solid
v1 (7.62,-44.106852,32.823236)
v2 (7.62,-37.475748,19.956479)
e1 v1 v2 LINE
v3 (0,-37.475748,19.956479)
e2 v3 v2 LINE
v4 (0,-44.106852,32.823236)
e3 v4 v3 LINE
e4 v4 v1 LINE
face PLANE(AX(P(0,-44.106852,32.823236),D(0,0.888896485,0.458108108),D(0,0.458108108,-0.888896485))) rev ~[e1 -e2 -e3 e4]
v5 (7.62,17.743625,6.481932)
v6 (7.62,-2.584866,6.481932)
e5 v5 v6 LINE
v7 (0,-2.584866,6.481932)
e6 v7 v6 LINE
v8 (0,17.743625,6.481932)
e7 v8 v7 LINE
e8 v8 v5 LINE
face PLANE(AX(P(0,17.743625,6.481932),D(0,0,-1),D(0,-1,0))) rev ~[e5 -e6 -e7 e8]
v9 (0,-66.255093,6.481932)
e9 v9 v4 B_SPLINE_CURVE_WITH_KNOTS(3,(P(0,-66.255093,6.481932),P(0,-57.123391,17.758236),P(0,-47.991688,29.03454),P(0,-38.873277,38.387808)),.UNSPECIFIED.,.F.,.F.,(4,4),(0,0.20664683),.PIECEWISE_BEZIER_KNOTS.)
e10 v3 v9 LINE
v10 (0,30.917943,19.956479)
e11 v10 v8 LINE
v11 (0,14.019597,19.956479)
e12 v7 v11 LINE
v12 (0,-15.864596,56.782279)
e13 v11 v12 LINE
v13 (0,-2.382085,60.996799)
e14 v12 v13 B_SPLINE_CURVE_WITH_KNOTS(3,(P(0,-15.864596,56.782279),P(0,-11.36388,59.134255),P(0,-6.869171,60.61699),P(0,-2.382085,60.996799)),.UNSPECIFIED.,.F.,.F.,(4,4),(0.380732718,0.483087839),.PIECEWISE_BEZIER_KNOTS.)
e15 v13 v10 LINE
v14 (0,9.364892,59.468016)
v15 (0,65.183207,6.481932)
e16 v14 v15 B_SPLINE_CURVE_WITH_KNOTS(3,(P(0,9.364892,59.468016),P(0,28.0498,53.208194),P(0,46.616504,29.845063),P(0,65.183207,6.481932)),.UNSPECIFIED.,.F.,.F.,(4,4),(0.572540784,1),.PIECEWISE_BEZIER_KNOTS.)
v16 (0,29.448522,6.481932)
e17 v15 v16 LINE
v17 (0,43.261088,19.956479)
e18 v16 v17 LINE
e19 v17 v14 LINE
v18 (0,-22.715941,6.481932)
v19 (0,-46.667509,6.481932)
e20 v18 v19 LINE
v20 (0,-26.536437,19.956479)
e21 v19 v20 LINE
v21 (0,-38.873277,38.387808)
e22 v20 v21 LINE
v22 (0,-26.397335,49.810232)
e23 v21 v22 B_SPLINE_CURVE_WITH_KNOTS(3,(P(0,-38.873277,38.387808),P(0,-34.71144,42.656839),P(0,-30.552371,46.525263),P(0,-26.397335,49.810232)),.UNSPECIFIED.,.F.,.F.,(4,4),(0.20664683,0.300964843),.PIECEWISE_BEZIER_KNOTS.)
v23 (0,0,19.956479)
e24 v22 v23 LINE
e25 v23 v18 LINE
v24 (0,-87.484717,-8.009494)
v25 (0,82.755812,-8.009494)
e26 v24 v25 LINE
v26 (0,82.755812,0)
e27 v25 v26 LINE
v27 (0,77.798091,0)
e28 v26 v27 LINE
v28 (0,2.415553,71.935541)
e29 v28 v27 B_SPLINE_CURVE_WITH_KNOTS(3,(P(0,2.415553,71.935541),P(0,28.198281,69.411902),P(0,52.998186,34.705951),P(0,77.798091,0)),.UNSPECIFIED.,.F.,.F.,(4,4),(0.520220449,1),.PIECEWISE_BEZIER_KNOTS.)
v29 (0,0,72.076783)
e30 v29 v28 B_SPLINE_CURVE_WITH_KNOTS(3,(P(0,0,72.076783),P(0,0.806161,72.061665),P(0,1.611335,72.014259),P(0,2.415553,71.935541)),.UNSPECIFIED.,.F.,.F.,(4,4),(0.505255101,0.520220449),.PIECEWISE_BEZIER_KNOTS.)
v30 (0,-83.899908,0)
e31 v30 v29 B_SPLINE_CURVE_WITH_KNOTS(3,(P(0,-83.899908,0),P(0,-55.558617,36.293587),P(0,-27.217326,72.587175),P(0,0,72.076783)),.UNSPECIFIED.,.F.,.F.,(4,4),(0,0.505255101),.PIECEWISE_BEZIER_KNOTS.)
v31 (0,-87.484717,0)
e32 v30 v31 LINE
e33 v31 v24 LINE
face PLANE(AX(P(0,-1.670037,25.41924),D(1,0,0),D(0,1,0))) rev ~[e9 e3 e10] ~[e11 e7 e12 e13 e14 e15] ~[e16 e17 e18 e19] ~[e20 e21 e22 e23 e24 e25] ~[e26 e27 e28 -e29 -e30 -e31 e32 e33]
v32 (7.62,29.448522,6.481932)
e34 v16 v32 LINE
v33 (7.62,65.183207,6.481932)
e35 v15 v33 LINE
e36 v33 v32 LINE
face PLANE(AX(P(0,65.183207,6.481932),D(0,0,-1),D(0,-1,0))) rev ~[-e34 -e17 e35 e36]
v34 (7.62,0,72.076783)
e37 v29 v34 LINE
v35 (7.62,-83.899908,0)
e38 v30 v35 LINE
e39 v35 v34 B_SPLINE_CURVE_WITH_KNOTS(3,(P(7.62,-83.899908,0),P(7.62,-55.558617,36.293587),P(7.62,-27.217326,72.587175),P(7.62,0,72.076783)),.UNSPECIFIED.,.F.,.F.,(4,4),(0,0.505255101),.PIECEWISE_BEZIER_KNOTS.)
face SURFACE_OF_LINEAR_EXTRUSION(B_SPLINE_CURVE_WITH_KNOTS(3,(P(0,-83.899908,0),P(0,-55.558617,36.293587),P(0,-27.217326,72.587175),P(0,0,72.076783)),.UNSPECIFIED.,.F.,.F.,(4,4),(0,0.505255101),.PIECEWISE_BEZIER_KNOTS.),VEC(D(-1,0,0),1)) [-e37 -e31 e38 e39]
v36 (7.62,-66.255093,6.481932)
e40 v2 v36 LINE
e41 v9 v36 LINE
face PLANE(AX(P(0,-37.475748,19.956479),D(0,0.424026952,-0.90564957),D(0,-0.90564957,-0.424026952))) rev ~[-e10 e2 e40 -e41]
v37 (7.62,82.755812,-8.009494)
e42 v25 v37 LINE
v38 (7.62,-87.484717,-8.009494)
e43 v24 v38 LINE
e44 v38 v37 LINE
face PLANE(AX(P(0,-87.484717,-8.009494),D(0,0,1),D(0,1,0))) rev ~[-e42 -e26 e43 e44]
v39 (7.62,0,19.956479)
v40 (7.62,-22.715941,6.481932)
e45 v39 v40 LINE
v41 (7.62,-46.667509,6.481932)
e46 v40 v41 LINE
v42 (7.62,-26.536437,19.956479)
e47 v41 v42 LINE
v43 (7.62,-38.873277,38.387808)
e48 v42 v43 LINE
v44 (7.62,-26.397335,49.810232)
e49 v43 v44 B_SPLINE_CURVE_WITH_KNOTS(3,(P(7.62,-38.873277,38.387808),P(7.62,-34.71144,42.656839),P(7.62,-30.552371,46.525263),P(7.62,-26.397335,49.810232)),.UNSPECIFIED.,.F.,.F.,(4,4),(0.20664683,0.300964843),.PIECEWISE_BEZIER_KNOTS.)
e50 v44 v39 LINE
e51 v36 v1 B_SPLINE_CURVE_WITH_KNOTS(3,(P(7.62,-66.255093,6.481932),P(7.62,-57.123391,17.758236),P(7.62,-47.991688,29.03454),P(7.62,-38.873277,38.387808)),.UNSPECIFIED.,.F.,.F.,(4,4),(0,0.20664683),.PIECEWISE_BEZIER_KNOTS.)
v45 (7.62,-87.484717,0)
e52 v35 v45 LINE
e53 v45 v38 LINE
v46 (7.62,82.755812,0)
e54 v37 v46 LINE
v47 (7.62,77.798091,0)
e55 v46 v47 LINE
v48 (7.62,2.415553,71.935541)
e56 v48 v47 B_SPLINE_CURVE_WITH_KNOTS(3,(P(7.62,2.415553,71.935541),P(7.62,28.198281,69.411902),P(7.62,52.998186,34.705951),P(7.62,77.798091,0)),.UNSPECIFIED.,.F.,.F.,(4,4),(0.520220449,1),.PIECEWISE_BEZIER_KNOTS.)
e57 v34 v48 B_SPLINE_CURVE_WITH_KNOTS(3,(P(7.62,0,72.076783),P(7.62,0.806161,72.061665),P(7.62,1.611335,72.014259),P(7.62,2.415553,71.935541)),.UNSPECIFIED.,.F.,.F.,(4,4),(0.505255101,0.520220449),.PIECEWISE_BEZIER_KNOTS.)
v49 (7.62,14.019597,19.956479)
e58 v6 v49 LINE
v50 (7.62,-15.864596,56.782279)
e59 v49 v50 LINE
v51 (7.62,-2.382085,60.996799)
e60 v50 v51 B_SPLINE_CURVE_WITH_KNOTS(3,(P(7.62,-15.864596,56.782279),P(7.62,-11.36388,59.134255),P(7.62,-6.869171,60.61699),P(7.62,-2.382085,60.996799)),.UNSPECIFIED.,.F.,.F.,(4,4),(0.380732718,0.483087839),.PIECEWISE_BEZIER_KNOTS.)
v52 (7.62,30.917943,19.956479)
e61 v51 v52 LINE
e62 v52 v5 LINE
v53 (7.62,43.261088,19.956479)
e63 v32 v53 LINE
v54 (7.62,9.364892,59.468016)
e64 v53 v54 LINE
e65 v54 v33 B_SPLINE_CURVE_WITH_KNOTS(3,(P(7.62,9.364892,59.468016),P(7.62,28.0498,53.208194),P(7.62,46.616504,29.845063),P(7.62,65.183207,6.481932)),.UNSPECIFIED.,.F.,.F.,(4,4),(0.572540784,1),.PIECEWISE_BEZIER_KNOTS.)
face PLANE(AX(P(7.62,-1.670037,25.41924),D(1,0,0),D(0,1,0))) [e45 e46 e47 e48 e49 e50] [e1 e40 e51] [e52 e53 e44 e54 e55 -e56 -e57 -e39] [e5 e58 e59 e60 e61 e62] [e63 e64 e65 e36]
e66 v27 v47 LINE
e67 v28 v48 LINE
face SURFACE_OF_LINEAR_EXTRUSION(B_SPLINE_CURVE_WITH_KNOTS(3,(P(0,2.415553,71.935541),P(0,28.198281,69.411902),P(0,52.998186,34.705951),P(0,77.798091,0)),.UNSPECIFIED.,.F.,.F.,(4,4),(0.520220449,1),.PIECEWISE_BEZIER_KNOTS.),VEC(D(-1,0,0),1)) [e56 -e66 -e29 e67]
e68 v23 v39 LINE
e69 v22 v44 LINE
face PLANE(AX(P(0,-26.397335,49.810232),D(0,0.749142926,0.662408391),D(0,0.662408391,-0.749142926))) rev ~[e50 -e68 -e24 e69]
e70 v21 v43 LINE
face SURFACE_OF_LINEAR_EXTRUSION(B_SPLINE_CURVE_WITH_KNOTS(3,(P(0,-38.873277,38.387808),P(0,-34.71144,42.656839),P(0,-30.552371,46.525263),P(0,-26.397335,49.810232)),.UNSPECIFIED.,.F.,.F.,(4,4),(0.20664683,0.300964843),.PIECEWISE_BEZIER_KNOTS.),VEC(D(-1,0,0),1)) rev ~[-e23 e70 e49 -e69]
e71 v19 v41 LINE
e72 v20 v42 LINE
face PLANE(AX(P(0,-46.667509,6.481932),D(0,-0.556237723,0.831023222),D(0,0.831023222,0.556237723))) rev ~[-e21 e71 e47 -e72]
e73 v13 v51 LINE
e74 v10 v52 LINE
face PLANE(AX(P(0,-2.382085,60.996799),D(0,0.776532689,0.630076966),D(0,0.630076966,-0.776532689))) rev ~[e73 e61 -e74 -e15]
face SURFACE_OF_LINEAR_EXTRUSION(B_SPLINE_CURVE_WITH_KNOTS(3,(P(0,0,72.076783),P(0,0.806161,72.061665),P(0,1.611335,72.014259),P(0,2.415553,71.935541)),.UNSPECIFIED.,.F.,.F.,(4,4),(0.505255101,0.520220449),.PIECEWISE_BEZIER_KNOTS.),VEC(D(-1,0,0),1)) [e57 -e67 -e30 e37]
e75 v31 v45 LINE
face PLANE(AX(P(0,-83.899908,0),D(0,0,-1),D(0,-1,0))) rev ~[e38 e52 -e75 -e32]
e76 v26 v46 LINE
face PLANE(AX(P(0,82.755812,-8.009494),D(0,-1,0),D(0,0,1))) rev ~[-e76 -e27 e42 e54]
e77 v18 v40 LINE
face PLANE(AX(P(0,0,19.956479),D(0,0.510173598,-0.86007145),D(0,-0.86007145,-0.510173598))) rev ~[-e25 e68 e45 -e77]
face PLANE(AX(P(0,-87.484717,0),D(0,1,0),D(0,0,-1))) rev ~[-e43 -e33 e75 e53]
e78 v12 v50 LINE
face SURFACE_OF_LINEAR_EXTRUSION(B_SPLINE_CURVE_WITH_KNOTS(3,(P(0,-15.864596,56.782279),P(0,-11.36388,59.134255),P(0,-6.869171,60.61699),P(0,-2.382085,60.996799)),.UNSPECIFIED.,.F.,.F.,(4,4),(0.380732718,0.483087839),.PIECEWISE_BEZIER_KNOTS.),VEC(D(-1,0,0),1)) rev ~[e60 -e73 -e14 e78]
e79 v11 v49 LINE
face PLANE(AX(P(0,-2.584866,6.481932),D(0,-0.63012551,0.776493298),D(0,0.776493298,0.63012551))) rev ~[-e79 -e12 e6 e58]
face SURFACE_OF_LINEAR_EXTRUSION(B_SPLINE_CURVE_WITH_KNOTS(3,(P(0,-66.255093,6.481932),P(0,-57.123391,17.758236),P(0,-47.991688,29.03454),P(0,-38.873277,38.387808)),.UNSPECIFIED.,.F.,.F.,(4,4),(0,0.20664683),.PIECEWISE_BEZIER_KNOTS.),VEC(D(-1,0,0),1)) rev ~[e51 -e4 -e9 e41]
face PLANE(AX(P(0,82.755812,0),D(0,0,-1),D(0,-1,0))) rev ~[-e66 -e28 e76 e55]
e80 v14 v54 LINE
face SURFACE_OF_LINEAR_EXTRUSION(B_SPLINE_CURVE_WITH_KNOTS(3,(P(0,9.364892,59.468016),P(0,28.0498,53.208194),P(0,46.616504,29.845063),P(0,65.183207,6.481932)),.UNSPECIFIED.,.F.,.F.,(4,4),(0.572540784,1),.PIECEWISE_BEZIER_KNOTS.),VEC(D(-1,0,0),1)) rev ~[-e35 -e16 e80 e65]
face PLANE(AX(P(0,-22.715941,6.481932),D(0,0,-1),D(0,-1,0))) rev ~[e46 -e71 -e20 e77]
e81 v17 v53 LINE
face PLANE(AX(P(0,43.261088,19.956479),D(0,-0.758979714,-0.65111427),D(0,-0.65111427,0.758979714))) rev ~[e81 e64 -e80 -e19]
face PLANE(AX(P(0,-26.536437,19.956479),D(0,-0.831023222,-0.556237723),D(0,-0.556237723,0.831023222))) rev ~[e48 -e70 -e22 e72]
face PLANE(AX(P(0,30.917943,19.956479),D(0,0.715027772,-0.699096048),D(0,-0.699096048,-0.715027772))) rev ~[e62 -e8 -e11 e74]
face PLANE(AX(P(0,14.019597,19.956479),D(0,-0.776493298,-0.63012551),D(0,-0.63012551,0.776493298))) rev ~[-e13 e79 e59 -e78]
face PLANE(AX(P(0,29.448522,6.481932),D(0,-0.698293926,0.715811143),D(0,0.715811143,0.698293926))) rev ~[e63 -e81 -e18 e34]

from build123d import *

# Parameters (mm, degrees)
F1_DEPTH = 7.62


with BuildPart() as f1:
    # F0 (on Right) → F1 (new body)
    with BuildSketch(Plane.YZ):
        with BuildLine():
            Line((-83.8999077678, 0), (-76.0438218713, 0))
            Line((-76.0438218713, 0), (-68.3361637849, 0))
            Line((-68.3361637849, 0), (-65.6663442796, 0))
            Line((-65.6663442796, 0), (-59.0906857838, 0))
            Line((-59.0906857838, 0), (-56.6208846061, 0))
            Line((-56.6208846061, 0), (-50.1111261547, 0))
            Line((-50.1111261547, 0), (-47.2127646201, 0))
            Line((-47.2127646201, 0), (-40.9584082663, 0))
            Line((-40.9584082663, 0), (-38.0600504577, 0))
            Line((-38.0600504577, 0), (-31.6531471908, 0))
            Line((-31.6531471908, 0), (-28.9073325694, 0))
            Line((-28.9073325694, 0), (-22.5004293025, 0))
            Line((-22.5004293025, 0), (-19.9071597308, 0))
            Line((-19.9071597308, 0), (-13.4495065357, 0))
            Line((-13.4495065357, 0), (-10.754442774, 0))
            Line((-10.754442774, 0), (-4.1949953884, 0))
            Line((-4.1949953884, 0), (-1.6017258168, 0))
            Line((-1.6017258168, 0), (4.8051769845, 0))
            Line((4.8051769845, 0), (7.3984456249, 0))
            Line((7.3984456249, 0), (13.8053493574, 0))
            Line((13.8053493574, 0), (16.7037080973, 0))
            Line((16.7037080973, 0), (23.1106095016, 0))
            Line((23.1106095016, 0), (25.7038809359, 0))
            Line((25.7038809359, 0), (32.1107842028, 0))
            Line((32.1107842028, 0), (34.5515049994, 0))
            Line((34.5515049994, 0), (40.958404541, 0))
            Line((40.958404541, 0), (43.7042228877, 0))
            Line((43.7042228877, 0), (50.1111261552, 0))
            Line((50.1111261552, 0), (52.7043938637, 0))
            Line((52.7043938637, 0), (59.263844043, 0))
            Line((59.263844043, 0), (61.8571154775, 0))
            Line((61.8571154775, 0), (72.8403702378, 0))
            Line((72.8403702378, 0), (77.7980908751, 0))
            add(Edge.make_bspline(
                [(2.4155534392, 71.935541455), (28.1982811761, 69.4119022605), (52.9981860256, 34.7059511303), (77.7980908751, 0)],
                knots=[0.5202204491, 0.5202204491, 0.5202204491, 0.5202204491, 1, 1, 1, 1], degree=3))
            add(Edge.make_bspline(
                [(2.4155534392, 71.935541455), (23.457256807, 69.5741418959), (44.3202320999, 38.0280369375), (65.1832073927, 6.4819319791)],
                knots=[0.5194057291, 0.5194057291, 0.5194057291, 0.5194057291, 1, 1, 1, 1], degree=3))
            Line((65.1832073927, 6.4819319791), (29.4485222548, 6.4819319791))
            Line((29.4485222548, 6.4819319791), (17.7436252383, 6.4819319791))
            Line((17.7436252383, 6.4819319791), (-2.5848655496, 6.4819319791))
            Line((-2.5848655496, 6.4819319791), (-22.7159410715, 6.4819319791))
            Line((-22.7159410715, 6.4819319791), (-46.667508781, 6.4819319791))
            Line((-46.667508781, 6.4819319791), (-66.2550926208, 6.4819319791))
            add(Edge.make_bspline(
                [(-66.2550926208, 6.4819319791), (-44.7386888592, 38.3814174671), (-23.2222850975, 70.2809029552), (-1.8906832982, 72.0038712376)],
                knots=[0, 0, 0, 0, 0.4866401258, 0.4866401258, 0.4866401258, 0.4866401258], degree=3))
            add(Edge.make_bspline(
                [(-1.8906832982, 72.0038712376), (-1.2602925513, 72.0547883357), (-0.6300631821, 72.0793517198), (2.66e-08, 72.0767825841)],
                knots=[0.4866401258, 0.4866401258, 0.4866401258, 0.4866401258, 0.5010212977, 0.5010212977, 0.5010212977, 0.5010212977], degree=3))
            add(Edge.make_bspline(
                [(-83.8999077678, 0), (-55.5586168349, 36.2935873023), (-27.217325902, 72.5871746046), (0, 72.0767825842)],
                knots=[0, 0, 0, 0, 0.505255101, 0.505255101, 0.505255101, 0.505255101], degree=3))
        make_face()
        Polygon((-68.3361637849, 0), (-76.0438218713, 0), (-83.8999077678, 0), (-87.4847173691, 0), (-87.4847173691, -8.0094942823), (82.7558115125, -8.0094942823), (82.7558115125, 0), (77.7980908751, 0), (72.8403702378, 0), (61.8571154775, 0), (59.263844043, 0), (52.7043938637, 0), (50.1111261552, 0), (43.7042228877, 0), (40.958404541, 0), (34.5515049994, 0), (32.1107842028, 0), (25.7038809359, 0), (23.1106095016, 0), (16.7037080973, 0), (13.8053493574, 0), (7.3984456249, 0), (4.8051769845, 0), (-1.6017258168, 0), (-4.1949953884, 0), (-10.754442774, 0), (-13.4495065357, 0), (-19.9071597308, 0), (-22.5004293025, 0), (-28.9073325694, 0), (-31.6531471908, 0), (-38.0600504577, 0), (-40.9584082663, 0), (-47.2127646201, 0), (-50.1111261547, 0), (-56.6208846061, 0), (-59.0906857838, 0), (-65.6663442796, 0), align=None)
        with BuildLine():
            add(Edge.make_bspline(
                [(0, 72.0767825842), (0.8061606012, 72.0616650837), (1.6113351386, 72.0142591471), (2.4155534392, 71.935541455)],
                knots=[0.505255101, 0.505255101, 0.505255101, 0.505255101, 0.5202204491, 0.5202204491, 0.5202204491, 0.5202204491], degree=3))
            add(Edge.make_bspline(
                [(-1.8906832982, 72.0038712376), (-1.2602925513, 72.0547883357), (-0.6300631821, 72.0793517198), (2.66e-08, 72.0767825841)],
                knots=[0.4866401258, 0.4866401258, 0.4866401258, 0.4866401258, 0.5010212977, 0.5010212977, 0.5010212977, 0.5010212977], degree=3))
            add(Edge.make_bspline(
                [(-66.2550926208, 6.4819319791), (-44.7386888592, 38.3814174671), (-23.2222850975, 70.2809029552), (-1.8906832982, 72.0038712376)],
                knots=[0, 0, 0, 0, 0.4866401258, 0.4866401258, 0.4866401258, 0.4866401258], degree=3))
            add(Edge.make_bspline(
                [(-66.2550926208, 6.4819319791), (-58.870002531, 15.6014280008), (-51.4849124411, 24.7209240225), (-44.1068523116, 32.8232360474)],
                knots=[0, 0, 0, 0, 0.1671216862, 0.1671216862, 0.1671216862, 0.1671216862], degree=3))
            add(Edge.make_bspline(
                [(-44.1068523116, 32.8232360474), (-42.3619029204, 34.7394747588), (-40.6173467479, 36.5988175914), (-38.8732767924, 38.3878083756)],
                knots=[0.1671216862, 0.1671216862, 0.1671216862, 0.1671216862, 0.2066468296, 0.2066468296, 0.2066468296, 0.2066468296], degree=3))
            add(Edge.make_bspline(
                [(-38.8732767924, 38.3878083756), (-34.7114395699, 42.6568392208), (-30.5523710257, 46.5252625196), (-26.3973348433, 49.8102324575)],
                knots=[0.2066468296, 0.2066468296, 0.2066468296, 0.2066468296, 0.3009648428, 0.3009648428, 0.3009648428, 0.3009648428], degree=3))
            add(Edge.make_bspline(
                [(-26.3973348433, 49.8102324575), (-22.8832827761, 52.5884406113), (-19.3721149148, 54.9493251989), (-15.8645956908, 56.7822785692)],
                knots=[0.3009648428, 0.3009648428, 0.3009648428, 0.3009648428, 0.3807327183, 0.3807327183, 0.3807327183, 0.3807327183], degree=3))
            add(Edge.make_bspline(
                [(-15.8645956908, 56.7822785692), (-11.3638797078, 59.1342549956), (-6.8691712251, 60.6169899499), (-2.3820852822, 60.9967989829)],
                knots=[0.3807327183, 0.3807327183, 0.3807327183, 0.3807327183, 0.4830878387, 0.4830878387, 0.4830878387, 0.4830878387], degree=3))
            add(Edge.make_bspline(
                [(-2.3820852822, 60.9967989829), (-1.5878150287, 61.0640299254), (2.3324808206, 61.2253407539), (6.2467363494, 60.5126612784), (9.3648919901, 59.4680160873)],
                knots=[0.4830878387, 0.4830878387, 0.4830878387, 0.4830878387, 0.5012059734, 0.5725407835, 0.5725407835, 0.5725407835, 0.5725407835], degree=3))
            add(Edge.make_bspline(
                [(9.3648919901, 59.4680160873), (28.0498000323, 53.2081940706), (46.6165037125, 29.8450630249), (65.1832073927, 6.4819319791)],
                knots=[0.5725407835, 0.5725407835, 0.5725407835, 0.5725407835, 1, 1, 1, 1], degree=3))
            add(Edge.make_bspline(
                [(2.4155534392, 71.935541455), (23.457256807, 69.5741418959), (44.3202320999, 38.0280369375), (65.1832073927, 6.4819319791)],
                knots=[0.5194057291, 0.5194057291, 0.5194057291, 0.5194057291, 1, 1, 1, 1], degree=3))
        make_face()
        with BuildLine():
            Line((-37.4757476613, 19.9564792332), (-66.2550926208, 6.4819319791))
            Line((-66.2550926208, 6.4819319791), (-46.667508781, 6.4819319791))
            Line((-46.667508781, 6.4819319791), (-26.5364367513, 19.9564792332))
            Line((-26.5364367513, 19.9564792332), (-38.8732767924, 38.3878083756))
            add(Edge.make_bspline(
                [(-44.1068523116, 32.8232360474), (-42.3619029204, 34.7394747588), (-40.6173467479, 36.5988175914), (-38.8732767924, 38.3878083756)],
                knots=[0.1671216862, 0.1671216862, 0.1671216862, 0.1671216862, 0.2066468296, 0.2066468296, 0.2066468296, 0.2066468296], degree=3))
            Line((-44.1068523116, 32.8232360474), (-37.4757476613, 19.9564792332))
        make_face()
        with BuildLine():
            Line((17.7436252383, 6.4819319791), (29.4485222548, 6.4819319791))
            Line((29.4485222548, 6.4819319791), (43.261088431, 19.9564792332))
            Line((43.261088431, 19.9564792332), (9.3648919901, 59.4680160873))
            add(Edge.make_bspline(
                [(-2.3820852822, 60.9967989829), (-1.5878150287, 61.0640299254), (2.3324808206, 61.2253407539), (6.2467363494, 60.5126612784), (9.3648919901, 59.4680160873)],
                knots=[0.4830878387, 0.4830878387, 0.4830878387, 0.4830878387, 0.5012059734, 0.5725407835, 0.5725407835, 0.5725407835, 0.5725407835], degree=3))
            Line((-2.3820852822, 60.9967989829), (30.9179425241, 19.9564792332))
            Line((30.9179425241, 19.9564792332), (17.7436252383, 6.4819319791))
        make_face()
        with BuildLine():
            Line((0, 19.9564792332), (-22.7159410715, 6.4819319791))
            Line((-22.7159410715, 6.4819319791), (-2.5848655496, 6.4819319791))
            Line((-2.5848655496, 6.4819319791), (14.0195973219, 19.9564792332))
            Line((14.0195973219, 19.9564792332), (-15.8645956908, 56.7822785692))
            add(Edge.make_bspline(
                [(-26.3973348433, 49.8102324575), (-22.8832827761, 52.5884406113), (-19.3721149148, 54.9493251989), (-15.8645956908, 56.7822785692)],
                knots=[0.3009648428, 0.3009648428, 0.3009648428, 0.3009648428, 0.3807327183, 0.3807327183, 0.3807327183, 0.3807327183], degree=3))
            Line((-26.3973348433, 49.8102324575), (0, 19.9564792332))
        make_face()
    extrude(amount=F1_DEPTH)


solid = f1.part
